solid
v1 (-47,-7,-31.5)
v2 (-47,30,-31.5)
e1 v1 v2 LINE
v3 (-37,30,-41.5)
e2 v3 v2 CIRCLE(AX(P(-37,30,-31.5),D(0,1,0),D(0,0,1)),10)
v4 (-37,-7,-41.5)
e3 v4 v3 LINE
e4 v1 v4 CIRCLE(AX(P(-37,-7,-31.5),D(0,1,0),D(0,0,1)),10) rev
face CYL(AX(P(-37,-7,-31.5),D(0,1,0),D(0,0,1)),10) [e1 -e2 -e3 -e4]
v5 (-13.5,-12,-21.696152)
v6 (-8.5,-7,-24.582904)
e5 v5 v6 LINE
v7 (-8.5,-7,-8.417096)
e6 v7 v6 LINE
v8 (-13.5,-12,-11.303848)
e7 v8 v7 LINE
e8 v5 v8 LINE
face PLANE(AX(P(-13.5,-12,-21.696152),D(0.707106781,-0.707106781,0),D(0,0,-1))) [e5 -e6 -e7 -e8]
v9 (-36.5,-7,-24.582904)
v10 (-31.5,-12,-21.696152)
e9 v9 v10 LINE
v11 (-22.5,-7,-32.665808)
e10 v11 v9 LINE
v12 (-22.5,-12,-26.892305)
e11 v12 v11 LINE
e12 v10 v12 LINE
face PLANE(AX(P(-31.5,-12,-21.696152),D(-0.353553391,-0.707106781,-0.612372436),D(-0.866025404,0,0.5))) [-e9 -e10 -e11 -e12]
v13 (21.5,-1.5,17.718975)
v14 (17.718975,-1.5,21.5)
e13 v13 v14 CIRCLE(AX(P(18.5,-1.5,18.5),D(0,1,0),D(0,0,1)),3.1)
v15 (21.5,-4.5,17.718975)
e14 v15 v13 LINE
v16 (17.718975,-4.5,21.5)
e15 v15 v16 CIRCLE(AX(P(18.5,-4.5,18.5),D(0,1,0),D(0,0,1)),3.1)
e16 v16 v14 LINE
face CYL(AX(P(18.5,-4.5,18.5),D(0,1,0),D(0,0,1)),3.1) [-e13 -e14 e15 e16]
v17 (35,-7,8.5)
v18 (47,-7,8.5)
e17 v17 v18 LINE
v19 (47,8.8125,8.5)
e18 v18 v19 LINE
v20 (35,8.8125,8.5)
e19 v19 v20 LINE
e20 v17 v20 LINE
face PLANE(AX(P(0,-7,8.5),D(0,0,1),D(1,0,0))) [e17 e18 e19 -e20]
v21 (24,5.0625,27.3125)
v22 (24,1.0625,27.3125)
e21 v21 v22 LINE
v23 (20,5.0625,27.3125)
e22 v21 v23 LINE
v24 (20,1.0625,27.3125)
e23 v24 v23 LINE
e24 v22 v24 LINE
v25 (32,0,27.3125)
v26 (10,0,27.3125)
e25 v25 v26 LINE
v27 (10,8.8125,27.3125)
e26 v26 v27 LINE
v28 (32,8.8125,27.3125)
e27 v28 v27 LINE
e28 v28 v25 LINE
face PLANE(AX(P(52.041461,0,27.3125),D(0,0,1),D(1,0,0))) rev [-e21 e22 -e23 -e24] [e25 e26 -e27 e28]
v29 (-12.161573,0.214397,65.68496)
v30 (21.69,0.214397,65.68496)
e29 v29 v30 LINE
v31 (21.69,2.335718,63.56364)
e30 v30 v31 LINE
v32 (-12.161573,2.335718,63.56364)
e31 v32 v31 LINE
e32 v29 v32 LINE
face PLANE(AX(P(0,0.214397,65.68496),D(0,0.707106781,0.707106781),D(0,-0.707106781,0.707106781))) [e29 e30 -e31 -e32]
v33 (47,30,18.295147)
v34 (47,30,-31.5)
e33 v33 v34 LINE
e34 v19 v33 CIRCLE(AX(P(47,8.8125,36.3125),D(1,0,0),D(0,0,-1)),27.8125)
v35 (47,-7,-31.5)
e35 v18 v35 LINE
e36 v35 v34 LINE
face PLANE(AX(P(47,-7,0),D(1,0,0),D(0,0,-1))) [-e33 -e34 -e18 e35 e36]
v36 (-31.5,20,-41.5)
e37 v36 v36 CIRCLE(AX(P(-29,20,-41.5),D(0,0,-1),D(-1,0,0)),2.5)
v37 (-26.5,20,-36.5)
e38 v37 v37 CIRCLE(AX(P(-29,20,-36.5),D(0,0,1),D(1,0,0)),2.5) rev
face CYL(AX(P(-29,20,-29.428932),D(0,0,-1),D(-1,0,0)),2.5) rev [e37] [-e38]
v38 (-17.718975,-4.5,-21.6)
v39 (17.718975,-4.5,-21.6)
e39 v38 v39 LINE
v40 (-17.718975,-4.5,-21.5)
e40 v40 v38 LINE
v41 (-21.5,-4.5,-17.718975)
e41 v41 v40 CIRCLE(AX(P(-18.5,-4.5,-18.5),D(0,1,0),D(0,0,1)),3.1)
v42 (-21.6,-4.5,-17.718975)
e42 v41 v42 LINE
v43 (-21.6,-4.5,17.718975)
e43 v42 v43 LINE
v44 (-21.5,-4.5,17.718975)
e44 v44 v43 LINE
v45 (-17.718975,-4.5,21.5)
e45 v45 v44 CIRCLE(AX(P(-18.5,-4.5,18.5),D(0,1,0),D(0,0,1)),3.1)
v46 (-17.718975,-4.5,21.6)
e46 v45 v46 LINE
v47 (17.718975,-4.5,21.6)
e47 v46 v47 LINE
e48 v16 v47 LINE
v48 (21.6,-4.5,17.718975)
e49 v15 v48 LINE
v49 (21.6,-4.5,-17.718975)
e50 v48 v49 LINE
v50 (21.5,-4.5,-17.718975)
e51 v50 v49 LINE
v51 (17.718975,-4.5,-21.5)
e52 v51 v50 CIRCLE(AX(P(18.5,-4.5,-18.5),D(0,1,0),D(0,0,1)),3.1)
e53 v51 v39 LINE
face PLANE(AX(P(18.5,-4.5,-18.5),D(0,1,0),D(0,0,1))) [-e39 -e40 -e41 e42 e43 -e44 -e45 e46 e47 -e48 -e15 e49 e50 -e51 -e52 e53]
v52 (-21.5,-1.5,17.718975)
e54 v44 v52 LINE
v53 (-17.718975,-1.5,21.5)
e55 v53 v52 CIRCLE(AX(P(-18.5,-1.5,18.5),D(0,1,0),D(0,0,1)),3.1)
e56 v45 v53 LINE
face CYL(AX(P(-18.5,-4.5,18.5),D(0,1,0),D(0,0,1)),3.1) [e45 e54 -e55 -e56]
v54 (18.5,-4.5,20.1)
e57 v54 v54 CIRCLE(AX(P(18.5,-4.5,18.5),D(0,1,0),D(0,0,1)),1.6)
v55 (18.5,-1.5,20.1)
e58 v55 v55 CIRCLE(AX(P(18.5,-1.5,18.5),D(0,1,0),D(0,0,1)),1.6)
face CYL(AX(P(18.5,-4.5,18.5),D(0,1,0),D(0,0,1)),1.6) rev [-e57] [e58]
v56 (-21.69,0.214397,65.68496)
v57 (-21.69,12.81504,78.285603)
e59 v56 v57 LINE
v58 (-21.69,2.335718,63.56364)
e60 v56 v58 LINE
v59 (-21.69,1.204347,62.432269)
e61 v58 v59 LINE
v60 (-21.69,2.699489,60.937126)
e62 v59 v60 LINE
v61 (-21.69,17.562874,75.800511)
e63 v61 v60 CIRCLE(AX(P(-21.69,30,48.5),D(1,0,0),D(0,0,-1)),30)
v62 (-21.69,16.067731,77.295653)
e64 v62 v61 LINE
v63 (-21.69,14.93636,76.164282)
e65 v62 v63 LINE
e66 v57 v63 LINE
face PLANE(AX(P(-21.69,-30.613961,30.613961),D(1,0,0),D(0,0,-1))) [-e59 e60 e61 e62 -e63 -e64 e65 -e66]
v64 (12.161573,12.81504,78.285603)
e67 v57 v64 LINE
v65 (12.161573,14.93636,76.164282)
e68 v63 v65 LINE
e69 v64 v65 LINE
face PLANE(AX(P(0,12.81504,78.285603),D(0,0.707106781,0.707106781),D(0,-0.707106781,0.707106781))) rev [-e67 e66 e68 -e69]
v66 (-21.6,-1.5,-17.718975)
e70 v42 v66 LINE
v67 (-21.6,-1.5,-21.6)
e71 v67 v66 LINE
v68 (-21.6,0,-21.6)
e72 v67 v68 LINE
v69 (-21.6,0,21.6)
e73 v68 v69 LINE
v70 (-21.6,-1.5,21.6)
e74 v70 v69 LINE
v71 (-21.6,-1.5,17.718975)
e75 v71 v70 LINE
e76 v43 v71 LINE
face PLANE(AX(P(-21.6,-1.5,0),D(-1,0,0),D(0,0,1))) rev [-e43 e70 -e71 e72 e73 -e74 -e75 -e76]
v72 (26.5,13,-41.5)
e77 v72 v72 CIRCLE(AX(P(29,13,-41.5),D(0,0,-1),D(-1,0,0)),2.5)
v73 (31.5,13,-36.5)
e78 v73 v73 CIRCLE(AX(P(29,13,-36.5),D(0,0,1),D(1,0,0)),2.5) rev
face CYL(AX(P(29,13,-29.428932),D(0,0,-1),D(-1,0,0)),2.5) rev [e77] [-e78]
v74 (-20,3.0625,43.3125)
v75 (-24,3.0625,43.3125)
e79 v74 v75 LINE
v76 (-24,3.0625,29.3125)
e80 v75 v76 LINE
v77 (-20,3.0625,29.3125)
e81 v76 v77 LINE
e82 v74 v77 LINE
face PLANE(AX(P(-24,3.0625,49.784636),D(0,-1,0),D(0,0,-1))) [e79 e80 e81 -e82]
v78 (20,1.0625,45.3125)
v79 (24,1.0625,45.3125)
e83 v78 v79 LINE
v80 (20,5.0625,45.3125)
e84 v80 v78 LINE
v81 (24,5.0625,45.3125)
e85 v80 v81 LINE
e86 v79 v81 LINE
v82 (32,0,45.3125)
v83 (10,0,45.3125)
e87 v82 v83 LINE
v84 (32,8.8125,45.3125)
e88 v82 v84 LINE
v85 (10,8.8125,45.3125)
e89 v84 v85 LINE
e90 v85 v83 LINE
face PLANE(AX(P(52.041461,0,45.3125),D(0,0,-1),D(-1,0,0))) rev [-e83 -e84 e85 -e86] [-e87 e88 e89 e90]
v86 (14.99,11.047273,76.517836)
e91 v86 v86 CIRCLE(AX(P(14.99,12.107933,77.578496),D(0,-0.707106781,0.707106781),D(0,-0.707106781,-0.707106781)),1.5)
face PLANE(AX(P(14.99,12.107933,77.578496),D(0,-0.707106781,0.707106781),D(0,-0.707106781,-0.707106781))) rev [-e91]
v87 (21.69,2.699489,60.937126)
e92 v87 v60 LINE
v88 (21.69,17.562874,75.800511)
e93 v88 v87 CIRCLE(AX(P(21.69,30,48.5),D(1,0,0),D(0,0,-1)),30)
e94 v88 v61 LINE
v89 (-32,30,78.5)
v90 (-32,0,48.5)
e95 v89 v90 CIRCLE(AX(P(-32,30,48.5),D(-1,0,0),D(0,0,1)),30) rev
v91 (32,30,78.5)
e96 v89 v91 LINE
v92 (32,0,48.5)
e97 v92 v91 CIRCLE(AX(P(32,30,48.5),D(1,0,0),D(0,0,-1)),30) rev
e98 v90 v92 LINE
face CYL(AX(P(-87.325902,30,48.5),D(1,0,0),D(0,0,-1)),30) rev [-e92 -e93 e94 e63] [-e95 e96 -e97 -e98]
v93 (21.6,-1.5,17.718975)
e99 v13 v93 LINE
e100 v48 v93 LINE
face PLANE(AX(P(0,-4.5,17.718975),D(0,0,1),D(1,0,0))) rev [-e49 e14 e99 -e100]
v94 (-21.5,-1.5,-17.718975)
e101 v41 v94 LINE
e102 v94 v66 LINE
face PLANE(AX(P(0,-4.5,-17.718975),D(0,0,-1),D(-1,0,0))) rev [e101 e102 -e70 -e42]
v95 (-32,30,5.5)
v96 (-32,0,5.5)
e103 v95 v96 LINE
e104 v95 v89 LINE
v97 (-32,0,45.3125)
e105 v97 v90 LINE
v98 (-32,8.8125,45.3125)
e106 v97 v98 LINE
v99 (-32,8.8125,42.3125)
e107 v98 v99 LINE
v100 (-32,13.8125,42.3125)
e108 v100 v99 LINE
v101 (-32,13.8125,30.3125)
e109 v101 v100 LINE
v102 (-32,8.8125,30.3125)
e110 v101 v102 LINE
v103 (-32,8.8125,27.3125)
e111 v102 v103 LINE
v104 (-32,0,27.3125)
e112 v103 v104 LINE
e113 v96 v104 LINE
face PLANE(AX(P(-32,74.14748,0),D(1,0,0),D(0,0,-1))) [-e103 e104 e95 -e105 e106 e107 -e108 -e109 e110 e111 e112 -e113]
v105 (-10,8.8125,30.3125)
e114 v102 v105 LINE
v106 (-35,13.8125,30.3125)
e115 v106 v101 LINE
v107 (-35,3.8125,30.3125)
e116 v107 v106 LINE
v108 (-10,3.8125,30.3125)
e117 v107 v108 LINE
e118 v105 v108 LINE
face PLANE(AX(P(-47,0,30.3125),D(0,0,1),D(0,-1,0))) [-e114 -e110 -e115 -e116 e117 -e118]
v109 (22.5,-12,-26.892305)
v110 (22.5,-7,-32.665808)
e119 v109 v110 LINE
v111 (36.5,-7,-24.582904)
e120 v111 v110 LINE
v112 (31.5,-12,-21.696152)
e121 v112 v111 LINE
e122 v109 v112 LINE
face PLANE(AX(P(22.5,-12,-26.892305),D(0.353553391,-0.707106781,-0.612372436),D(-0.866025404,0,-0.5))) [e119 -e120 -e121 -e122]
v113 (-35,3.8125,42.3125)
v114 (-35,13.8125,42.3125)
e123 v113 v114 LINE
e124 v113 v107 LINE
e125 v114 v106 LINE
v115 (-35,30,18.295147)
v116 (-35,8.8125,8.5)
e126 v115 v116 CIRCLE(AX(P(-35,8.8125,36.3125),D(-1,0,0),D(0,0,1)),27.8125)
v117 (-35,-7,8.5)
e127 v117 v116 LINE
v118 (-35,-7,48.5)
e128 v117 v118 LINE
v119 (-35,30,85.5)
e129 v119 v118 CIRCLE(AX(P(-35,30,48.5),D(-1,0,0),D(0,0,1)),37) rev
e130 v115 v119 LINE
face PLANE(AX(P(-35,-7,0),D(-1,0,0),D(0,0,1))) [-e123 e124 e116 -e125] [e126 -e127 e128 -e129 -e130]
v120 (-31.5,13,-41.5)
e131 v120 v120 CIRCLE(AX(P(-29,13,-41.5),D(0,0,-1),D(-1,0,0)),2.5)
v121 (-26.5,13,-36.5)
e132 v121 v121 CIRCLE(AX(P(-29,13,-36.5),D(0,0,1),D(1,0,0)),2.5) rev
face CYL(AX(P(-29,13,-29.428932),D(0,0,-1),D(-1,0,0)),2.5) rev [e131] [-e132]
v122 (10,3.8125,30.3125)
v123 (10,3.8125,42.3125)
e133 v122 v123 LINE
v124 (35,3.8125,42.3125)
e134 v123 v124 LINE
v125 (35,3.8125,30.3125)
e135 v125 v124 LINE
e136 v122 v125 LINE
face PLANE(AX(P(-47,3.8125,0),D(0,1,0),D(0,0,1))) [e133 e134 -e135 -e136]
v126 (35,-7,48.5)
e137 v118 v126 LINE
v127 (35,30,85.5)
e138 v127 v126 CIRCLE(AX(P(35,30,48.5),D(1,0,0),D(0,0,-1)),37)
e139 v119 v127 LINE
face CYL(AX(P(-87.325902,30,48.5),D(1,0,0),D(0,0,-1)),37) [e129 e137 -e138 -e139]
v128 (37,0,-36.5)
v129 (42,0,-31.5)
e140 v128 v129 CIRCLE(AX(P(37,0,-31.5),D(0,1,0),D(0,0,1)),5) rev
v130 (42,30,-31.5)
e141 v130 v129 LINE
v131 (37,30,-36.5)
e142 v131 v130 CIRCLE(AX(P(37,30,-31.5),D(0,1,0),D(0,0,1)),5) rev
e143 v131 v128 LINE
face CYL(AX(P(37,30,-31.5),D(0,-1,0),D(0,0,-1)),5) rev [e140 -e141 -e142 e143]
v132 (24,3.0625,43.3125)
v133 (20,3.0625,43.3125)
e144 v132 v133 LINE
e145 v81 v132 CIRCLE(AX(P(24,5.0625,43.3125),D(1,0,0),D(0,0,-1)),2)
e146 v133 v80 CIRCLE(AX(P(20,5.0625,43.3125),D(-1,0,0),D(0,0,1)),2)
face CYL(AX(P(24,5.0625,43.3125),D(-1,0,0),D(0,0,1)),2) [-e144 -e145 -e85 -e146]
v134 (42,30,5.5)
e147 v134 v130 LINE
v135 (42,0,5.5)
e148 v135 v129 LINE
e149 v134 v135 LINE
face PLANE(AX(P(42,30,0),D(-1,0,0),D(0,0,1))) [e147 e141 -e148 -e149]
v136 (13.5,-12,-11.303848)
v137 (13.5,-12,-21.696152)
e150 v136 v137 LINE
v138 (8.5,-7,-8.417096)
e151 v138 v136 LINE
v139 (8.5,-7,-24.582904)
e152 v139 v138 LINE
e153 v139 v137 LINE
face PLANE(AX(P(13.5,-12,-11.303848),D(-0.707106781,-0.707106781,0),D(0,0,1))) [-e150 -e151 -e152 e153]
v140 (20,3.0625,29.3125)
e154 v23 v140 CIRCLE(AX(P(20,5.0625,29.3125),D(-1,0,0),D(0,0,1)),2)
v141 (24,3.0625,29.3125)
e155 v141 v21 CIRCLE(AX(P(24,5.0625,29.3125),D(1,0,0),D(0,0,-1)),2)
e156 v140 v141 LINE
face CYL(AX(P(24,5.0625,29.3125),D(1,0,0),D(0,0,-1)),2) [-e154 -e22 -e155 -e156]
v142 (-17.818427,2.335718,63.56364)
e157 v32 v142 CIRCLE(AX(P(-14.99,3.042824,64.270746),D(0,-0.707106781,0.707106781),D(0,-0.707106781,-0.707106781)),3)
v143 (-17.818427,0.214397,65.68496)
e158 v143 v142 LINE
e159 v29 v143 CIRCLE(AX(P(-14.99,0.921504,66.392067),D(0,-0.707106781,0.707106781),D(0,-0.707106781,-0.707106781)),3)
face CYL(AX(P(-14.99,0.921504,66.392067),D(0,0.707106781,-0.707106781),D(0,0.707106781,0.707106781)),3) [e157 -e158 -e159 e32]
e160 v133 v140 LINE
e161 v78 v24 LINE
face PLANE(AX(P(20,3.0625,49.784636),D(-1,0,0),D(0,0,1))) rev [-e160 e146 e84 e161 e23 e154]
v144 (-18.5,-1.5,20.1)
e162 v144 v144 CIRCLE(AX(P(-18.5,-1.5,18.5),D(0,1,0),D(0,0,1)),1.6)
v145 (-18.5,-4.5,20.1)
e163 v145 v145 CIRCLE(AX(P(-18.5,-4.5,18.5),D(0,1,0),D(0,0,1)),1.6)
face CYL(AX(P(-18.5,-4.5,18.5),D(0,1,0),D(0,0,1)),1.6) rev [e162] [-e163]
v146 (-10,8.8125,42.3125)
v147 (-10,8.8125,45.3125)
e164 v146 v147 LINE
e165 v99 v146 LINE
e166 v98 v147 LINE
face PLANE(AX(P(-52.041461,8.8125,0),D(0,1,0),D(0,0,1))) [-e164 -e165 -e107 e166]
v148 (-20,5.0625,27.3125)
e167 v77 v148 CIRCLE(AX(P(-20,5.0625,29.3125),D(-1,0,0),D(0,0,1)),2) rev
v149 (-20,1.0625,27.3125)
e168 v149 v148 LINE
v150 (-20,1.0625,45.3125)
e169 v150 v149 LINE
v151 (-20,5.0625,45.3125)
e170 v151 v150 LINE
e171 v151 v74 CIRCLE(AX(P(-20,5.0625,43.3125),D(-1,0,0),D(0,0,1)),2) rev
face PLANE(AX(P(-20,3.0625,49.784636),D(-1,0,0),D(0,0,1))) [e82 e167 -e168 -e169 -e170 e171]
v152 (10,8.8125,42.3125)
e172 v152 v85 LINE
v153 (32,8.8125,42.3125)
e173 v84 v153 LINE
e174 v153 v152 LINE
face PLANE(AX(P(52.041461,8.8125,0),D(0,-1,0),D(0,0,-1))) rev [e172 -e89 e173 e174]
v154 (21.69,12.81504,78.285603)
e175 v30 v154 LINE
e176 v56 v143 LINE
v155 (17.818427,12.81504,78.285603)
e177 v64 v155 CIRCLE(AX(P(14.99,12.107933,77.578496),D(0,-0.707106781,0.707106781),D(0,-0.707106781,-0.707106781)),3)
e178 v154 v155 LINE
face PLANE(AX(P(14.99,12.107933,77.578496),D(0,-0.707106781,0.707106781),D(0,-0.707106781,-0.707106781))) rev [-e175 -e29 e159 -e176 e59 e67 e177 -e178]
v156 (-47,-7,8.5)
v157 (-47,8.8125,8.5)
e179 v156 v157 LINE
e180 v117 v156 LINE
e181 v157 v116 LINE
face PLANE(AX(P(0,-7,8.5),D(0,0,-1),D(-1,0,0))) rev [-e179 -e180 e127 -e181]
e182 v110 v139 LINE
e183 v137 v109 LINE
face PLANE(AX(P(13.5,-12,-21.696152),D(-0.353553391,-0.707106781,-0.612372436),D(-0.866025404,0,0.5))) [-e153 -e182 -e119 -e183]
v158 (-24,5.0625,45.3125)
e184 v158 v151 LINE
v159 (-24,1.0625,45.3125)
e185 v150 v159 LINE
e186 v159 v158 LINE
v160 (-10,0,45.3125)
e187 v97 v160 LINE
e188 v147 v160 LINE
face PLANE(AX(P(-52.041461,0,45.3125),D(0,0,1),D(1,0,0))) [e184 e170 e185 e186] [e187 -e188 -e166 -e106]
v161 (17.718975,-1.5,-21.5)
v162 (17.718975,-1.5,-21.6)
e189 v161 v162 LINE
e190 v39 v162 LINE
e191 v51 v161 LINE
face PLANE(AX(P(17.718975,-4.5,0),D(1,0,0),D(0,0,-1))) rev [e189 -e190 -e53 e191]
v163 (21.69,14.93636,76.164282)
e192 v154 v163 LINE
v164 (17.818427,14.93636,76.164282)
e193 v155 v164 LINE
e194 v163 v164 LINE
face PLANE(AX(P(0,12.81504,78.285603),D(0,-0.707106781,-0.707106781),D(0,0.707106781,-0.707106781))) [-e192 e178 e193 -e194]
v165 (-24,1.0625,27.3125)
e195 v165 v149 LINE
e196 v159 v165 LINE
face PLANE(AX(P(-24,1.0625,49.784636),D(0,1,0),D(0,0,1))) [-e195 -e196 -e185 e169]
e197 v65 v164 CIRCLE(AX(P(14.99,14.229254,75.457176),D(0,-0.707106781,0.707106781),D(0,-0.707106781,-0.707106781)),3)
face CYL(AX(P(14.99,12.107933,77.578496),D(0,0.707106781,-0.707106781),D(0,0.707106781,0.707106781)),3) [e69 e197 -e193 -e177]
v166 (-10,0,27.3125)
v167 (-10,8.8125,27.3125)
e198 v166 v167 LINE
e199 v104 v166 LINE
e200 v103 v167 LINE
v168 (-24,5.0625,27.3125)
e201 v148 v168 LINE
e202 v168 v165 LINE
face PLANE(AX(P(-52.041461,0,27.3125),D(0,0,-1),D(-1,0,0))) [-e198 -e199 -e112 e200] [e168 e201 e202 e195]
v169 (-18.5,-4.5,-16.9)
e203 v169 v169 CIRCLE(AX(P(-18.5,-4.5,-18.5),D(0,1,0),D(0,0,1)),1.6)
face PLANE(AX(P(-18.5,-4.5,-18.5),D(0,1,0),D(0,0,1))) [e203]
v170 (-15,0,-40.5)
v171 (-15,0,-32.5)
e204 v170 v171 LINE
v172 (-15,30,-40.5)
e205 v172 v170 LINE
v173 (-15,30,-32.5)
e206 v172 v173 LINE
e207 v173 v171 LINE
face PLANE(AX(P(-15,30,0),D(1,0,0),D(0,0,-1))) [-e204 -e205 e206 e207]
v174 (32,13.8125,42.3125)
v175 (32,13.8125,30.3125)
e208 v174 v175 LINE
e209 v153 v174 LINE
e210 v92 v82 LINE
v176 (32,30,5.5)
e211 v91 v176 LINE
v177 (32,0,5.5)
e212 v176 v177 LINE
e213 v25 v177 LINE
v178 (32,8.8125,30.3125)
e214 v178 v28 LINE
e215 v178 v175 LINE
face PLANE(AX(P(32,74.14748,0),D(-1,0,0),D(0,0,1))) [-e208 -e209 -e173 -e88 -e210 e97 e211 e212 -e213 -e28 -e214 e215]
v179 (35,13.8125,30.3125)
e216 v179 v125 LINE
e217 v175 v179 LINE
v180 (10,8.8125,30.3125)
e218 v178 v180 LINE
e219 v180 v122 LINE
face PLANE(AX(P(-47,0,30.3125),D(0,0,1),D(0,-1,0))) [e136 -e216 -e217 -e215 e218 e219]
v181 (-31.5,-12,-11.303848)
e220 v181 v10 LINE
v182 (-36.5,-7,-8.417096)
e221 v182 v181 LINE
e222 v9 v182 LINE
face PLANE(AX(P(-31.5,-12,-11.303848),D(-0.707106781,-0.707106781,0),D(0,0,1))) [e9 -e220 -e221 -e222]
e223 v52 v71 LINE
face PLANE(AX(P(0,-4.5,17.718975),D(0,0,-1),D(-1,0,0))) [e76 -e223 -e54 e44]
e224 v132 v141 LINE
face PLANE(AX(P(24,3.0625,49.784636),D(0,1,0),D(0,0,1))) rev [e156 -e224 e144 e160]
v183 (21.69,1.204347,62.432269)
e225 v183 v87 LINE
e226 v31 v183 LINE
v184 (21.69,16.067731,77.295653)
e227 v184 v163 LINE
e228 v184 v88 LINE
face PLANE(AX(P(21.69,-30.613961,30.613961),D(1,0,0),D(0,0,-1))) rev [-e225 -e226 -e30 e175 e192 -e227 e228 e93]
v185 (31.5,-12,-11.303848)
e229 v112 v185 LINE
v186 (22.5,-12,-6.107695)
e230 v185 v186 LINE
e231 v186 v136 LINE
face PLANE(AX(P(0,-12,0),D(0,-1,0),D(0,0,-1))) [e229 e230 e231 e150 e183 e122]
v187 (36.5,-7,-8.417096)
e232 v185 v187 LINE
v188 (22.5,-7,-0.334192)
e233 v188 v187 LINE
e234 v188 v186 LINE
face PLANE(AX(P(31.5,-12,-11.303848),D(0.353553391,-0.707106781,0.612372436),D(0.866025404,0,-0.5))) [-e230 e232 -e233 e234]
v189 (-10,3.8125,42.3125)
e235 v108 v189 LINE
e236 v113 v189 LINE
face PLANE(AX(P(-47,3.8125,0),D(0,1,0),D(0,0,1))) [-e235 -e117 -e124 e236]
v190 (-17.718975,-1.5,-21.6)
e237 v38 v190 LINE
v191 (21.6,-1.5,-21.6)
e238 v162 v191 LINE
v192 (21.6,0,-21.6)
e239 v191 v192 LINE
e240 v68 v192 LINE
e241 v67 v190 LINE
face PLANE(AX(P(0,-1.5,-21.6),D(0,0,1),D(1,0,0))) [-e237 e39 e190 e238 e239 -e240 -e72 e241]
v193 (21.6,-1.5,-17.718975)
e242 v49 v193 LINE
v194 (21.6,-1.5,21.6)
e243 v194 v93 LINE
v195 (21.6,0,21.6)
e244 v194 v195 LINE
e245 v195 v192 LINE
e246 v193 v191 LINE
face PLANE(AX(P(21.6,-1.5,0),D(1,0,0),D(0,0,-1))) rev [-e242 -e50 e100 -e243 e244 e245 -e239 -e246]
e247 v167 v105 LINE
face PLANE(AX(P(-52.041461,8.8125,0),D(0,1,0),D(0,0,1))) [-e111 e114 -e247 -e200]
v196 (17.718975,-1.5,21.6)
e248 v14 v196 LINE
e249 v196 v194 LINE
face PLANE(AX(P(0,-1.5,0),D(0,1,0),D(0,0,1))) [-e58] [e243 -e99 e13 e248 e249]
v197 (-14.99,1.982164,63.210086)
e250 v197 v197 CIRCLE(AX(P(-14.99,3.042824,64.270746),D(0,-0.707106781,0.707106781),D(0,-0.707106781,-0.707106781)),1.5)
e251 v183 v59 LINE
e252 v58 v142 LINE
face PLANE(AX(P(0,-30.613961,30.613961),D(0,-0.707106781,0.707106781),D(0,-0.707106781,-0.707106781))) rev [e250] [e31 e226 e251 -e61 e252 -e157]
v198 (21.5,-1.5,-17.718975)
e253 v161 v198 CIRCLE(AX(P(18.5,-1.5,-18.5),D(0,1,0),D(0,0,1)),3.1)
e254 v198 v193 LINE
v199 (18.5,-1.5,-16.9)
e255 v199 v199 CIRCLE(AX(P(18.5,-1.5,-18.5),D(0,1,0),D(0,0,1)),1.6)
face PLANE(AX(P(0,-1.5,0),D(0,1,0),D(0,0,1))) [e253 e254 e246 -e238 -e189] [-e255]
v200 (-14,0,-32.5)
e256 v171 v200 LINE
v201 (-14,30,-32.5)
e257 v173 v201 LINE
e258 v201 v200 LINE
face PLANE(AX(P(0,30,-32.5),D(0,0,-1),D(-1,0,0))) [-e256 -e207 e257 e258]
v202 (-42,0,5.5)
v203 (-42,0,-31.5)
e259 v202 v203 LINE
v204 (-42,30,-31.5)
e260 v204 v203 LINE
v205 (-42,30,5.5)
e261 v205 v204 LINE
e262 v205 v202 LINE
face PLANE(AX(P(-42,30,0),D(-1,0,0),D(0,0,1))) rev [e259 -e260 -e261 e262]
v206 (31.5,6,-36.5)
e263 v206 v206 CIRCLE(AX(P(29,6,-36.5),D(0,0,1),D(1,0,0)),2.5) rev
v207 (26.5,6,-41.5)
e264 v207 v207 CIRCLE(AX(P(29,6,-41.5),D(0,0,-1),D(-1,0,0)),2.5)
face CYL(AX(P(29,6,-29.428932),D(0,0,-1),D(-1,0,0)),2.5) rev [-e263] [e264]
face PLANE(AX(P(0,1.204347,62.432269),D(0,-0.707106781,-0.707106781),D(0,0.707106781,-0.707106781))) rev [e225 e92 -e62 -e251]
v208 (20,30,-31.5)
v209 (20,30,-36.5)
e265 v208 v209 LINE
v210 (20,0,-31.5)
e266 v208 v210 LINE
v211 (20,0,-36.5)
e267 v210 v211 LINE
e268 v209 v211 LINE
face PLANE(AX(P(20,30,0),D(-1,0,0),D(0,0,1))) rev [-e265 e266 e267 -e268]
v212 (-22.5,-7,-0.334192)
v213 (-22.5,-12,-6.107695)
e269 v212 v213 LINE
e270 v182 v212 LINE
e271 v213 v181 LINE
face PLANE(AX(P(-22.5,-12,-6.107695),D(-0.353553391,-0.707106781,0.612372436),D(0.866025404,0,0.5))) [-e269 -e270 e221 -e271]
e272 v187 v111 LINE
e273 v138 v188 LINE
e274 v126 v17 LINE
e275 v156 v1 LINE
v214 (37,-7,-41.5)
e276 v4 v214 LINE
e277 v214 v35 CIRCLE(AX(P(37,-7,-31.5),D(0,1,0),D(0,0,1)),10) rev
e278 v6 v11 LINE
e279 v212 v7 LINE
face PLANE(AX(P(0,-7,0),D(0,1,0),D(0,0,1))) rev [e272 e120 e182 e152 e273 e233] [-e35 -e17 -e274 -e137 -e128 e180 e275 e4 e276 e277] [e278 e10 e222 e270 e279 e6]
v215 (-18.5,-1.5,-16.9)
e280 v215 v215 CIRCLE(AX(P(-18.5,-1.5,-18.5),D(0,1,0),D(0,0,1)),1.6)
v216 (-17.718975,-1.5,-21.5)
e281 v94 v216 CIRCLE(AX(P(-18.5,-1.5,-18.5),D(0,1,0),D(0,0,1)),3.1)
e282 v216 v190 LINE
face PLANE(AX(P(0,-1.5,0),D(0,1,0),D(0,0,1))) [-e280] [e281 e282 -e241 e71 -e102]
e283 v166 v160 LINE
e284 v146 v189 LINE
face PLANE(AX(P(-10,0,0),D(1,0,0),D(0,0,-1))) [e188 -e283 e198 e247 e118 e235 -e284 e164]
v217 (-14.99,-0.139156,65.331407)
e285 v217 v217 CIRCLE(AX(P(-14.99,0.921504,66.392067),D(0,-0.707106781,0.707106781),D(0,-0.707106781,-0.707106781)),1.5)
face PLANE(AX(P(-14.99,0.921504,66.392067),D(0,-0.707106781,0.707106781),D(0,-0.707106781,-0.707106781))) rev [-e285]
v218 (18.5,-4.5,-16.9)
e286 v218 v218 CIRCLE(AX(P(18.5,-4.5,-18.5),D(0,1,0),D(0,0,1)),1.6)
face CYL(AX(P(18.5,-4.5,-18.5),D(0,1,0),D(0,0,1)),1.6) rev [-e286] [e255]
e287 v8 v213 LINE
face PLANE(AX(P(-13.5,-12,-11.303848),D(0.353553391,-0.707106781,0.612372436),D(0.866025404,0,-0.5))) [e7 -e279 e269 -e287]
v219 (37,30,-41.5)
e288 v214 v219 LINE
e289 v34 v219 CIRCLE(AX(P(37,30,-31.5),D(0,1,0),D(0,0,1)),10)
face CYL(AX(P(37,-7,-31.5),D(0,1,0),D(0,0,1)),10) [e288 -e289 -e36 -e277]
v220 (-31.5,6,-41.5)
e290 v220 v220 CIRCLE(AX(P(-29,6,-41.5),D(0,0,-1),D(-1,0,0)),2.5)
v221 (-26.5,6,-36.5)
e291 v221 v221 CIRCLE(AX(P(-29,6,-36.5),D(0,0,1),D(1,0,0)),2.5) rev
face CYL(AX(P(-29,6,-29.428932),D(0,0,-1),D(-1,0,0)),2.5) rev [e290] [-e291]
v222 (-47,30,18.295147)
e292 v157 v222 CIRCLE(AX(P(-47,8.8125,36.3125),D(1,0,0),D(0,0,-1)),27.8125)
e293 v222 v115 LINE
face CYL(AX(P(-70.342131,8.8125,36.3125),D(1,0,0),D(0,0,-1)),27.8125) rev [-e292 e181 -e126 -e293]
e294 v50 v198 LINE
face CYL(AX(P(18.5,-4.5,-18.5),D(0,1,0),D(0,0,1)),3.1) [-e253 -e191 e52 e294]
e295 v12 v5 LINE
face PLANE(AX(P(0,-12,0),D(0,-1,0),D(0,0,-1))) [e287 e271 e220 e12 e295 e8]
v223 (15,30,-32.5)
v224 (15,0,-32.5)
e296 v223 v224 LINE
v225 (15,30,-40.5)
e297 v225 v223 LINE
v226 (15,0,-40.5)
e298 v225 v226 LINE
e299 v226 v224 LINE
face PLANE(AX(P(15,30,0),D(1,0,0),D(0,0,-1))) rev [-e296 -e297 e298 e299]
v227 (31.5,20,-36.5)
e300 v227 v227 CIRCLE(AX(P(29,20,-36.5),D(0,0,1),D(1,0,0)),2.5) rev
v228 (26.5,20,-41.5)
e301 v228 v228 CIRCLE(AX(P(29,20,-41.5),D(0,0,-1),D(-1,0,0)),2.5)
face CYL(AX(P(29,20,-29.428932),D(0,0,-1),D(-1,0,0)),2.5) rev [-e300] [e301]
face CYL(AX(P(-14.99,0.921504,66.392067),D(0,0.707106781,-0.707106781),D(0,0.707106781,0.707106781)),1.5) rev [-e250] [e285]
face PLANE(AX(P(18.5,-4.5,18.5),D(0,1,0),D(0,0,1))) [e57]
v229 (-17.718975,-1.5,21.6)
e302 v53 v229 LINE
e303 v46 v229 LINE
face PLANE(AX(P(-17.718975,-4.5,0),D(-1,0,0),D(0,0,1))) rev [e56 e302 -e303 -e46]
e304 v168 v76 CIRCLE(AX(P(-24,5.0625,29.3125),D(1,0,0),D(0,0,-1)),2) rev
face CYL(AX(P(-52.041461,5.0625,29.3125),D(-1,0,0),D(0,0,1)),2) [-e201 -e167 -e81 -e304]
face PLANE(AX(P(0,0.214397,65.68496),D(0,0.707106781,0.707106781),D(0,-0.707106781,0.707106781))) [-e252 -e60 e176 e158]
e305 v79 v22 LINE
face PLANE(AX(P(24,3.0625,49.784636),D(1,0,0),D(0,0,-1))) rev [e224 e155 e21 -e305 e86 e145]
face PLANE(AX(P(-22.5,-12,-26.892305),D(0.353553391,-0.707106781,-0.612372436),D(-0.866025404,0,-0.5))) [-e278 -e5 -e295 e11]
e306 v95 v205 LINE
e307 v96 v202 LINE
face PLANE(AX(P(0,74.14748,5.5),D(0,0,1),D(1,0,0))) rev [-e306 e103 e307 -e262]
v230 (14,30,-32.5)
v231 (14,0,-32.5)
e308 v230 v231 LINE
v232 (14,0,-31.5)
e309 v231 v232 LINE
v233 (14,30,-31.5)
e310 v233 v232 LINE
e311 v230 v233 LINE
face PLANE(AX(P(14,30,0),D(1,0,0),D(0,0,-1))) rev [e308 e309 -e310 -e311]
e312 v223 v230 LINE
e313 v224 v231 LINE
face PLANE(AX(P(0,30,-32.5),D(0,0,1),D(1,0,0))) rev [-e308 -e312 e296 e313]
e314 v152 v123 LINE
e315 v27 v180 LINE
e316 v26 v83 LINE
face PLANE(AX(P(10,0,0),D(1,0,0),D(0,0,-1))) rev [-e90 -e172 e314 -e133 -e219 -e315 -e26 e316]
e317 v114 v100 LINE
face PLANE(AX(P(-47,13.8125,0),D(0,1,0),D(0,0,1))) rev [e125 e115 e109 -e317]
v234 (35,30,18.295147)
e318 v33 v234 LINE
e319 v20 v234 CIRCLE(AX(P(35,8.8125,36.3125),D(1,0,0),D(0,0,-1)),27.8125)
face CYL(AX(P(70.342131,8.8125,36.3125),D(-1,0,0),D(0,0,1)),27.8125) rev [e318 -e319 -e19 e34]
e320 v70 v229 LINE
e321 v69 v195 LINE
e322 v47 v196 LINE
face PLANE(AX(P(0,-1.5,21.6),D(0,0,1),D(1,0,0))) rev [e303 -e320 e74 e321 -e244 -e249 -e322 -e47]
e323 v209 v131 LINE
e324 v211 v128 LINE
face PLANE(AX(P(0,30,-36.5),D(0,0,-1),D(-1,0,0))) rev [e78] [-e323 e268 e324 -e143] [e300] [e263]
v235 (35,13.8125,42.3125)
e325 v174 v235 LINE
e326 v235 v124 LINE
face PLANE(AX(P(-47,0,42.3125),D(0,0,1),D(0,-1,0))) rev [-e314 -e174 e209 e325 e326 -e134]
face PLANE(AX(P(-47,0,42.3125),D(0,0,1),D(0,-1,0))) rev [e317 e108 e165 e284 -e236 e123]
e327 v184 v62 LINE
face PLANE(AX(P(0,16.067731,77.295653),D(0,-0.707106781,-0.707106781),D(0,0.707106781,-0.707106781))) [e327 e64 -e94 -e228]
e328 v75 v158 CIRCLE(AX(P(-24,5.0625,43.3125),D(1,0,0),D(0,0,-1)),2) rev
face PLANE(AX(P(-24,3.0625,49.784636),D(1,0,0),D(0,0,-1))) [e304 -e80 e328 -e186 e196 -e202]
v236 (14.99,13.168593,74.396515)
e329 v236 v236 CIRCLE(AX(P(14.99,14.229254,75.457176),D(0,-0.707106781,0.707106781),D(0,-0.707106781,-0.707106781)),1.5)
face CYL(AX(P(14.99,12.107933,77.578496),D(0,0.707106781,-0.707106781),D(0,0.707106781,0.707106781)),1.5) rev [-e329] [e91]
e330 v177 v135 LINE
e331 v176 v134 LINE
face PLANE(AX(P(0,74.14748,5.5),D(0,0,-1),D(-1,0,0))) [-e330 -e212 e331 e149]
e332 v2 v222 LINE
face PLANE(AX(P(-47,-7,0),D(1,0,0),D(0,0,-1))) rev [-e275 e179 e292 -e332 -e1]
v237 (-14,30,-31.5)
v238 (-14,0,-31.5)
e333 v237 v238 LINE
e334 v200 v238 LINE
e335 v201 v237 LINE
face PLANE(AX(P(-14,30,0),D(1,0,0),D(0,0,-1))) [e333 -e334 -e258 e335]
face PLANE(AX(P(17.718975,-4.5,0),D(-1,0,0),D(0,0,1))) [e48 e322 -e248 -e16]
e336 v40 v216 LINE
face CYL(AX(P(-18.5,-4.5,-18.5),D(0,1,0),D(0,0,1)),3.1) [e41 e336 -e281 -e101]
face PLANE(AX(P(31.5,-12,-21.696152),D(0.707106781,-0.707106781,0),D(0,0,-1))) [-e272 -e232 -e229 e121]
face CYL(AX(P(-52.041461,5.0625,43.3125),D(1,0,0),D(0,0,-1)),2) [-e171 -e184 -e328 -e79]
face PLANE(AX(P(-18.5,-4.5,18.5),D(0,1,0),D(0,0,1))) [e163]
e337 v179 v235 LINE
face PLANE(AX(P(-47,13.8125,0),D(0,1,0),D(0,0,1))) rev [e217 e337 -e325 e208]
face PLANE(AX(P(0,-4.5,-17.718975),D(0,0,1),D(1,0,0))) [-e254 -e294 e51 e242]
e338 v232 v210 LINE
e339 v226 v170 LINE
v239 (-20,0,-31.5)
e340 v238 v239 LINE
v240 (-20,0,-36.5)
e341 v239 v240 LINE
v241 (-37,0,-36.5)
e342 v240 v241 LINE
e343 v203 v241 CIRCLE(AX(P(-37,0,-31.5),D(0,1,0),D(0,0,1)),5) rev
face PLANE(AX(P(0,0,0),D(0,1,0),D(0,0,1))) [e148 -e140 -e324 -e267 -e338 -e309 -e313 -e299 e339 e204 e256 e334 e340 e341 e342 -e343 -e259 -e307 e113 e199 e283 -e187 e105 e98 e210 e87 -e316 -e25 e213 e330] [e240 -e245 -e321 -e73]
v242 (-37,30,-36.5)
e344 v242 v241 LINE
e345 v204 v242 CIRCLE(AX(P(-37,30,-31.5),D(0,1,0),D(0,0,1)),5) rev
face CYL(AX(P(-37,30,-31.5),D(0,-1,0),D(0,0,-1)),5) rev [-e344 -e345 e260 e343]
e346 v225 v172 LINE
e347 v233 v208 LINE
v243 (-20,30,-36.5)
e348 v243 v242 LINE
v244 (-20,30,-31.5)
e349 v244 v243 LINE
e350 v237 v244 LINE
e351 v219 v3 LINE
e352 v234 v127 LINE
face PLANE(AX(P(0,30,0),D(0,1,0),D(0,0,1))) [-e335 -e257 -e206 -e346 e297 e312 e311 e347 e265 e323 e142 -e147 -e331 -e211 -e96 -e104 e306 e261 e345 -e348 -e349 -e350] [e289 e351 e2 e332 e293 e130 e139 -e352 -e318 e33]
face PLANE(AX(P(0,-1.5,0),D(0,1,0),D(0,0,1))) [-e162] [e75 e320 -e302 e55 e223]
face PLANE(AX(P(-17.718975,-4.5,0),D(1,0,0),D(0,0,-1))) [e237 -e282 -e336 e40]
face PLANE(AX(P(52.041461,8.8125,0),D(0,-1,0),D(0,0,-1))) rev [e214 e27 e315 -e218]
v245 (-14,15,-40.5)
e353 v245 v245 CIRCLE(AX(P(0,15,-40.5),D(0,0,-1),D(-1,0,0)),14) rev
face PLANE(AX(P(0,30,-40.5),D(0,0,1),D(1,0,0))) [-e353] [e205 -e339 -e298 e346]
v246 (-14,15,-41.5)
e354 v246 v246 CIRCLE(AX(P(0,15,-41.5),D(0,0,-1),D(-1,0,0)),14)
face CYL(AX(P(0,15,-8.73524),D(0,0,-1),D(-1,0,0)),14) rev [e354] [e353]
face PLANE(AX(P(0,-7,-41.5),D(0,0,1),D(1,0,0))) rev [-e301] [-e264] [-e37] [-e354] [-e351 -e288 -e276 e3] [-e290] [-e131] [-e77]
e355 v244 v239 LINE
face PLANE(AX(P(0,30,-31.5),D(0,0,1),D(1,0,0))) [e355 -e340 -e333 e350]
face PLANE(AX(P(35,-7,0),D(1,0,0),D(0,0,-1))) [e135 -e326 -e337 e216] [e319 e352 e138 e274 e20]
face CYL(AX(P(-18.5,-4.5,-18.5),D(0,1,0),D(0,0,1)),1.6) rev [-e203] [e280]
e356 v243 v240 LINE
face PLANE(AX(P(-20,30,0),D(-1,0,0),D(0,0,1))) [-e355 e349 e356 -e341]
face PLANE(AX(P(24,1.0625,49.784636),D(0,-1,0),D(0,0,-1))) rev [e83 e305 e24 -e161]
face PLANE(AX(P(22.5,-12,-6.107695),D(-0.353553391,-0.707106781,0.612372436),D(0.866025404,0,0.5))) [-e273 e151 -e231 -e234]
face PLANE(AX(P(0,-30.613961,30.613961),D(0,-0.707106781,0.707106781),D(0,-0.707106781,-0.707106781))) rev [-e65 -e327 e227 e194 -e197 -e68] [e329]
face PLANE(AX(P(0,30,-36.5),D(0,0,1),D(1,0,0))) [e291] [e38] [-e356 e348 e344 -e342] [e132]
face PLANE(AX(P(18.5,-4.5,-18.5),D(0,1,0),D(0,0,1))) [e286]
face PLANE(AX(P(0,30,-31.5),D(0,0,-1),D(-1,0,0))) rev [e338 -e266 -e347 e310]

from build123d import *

# Parameters (mm, degrees)
BOSS_EXTRUDE1_DEPTH             = 7
SKETCH1_5_W                     = 43.2
SKETCH1_5_H                     = 43.2
CUT_EXTRUDE1_DEPTH              = 1.5
CUT_EXTRUDE2_START              = -1.5
SKETCH1_6_R                     = 1.6
CUT_EXTRUDE2_DEPTH              = 3
BOSS_EXTRUDE2_START             = 30
BOSS_EXTRUDE2_DEPTH             = 30
BOSS_EXTRUDE3_REACH             = 75.9
BOSS_EXTRUDE3_DIRECTION_2_REACH = 75.9
SKETCH6_W                       = 43.38
SKETCH6_H                       = 21.02
CUT_EXTRUDE3_DEPTH              = 9
CUT_EXTRUDE4_START              = 9
SKETCH6_3_R                     = 1.5
CUT_EXTRUDE4_DEPTH              = 3
BOSS_EXTRUDE4_DEPTH             = 30
BOSS_EXTRUDE6_REACH             = 107.873
SKETCH8_W                       = 3
SKETCH8_H                       = 30
SKETCH9_R                       = 2.5
CUT_EXTRUDE5_DEPTH              = 5
CUT_EXTRUDE6_DEPTH              = 103.074727528
CUT_EXTRUDE6_DEPTH_BACK         = 103.074727528
SKETCH10_W                      = 12
SKETCH10_H                      = 10
BOSS_EXTRUDE7_START             = 10
BOSS_EXTRUDE7_DEPTH             = 22
BOSS_EXTRUDE8_START             = -10
BOSS_EXTRUDE8_DEPTH             = 22
BOSS_EXTRUDE9_START             = -35
BOSS_EXTRUDE9_DEPTH             = 12
BOSS_EXTRUDE10_START            = 47
BOSS_EXTRUDE10_DEPTH            = 12
BOSS_EXTRUDE11_DEPTH            = 5
CHAMFER1_SIZE                   = 5
BOSS_EXTRUDE12_DEPTH            = 1
SKETCH14_W                      = 4
SKETCH14_H                      = 2
CUT_EXTRUDE7_DEPTH              = 18
FILLET1_R                       = 2


with BuildPart() as part:
    # Sketch1 → Boss-Extrude1 (new body)
    with BuildSketch(Plane(origin=(0, 0, 0), x_dir=(1, 0, 0), z_dir=(0, 1, 0))):
        with BuildLine():
            Line((-35, -8.5), (-35, -48.5))
            Line((-35, -48.5), (35, -48.5))
            Line((35, -48.5), (35, -8.5))
            Line((35, -8.5), (47, -8.5))
            Line((47, -8.5), (47, 31.5))
            ThreePointArc((47, 31.5), (44.071067812, 38.571067812), (37, 41.5))
            Line((37, 41.5), (-37, 41.5))
            ThreePointArc((-37, 41.5), (-44.071067812, 38.571067812), (-47, 31.5))
            Line((-47, 31.5), (-47, -8.5))
            Line((-47, -8.5), (-35, -8.5))
        make_face()
    extrude(amount=-BOSS_EXTRUDE1_DEPTH)

    # Sketch1<5> → Cut-Extrude1 (cut)
    with BuildSketch(Plane(origin=(0, 0, 0), x_dir=(1, 0, 0), z_dir=(0, 1, 0))):
        Rectangle(SKETCH1_5_W, SKETCH1_5_H)
    extrude(amount=-CUT_EXTRUDE1_DEPTH, mode=Mode.SUBTRACT)

    # Sketch1<6> → Cut-Extrude2 (cut)
    with BuildSketch(Plane(origin=(0, 0, 0), x_dir=(1, 0, 0), z_dir=(0, 1, 0)).offset(CUT_EXTRUDE2_START)):
        with BuildLine():
            ThreePointArc((-17.718975032, 21.5), (-16.307968978, 16.307968978), (-21.5, 17.718975032))
            Line((-21.5, 17.718975032), (-21.6, 17.718975032))
            Line((-21.6, 17.718975032), (-21.6, -17.718975032))
            Line((-21.6, -17.718975032), (-21.5, -17.718975032))
            ThreePointArc((-21.5, -17.718975032), (-16.307968978, -16.307968978), (-17.718975032, -21.5))
            Line((-17.718975032, -21.5), (-17.718975032, -21.6))
            Line((-17.718975032, -21.6), (17.718975032, -21.6))
            Line((17.718975032, -21.6), (17.718975032, -21.5))
            ThreePointArc((17.718975032, -21.5), (16.307968978, -16.307968978), (21.5, -17.718975032))
            Line((21.5, -17.718975032), (21.6, -17.718975032))
            Line((21.6, -17.718975032), (21.6, 17.718975032))
            Line((21.6, 17.718975032), (21.5, 17.718975032))
            ThreePointArc((21.5, 17.718975032), (16.307968978, 16.307968978), (17.718975032, 21.5))
            Line((17.718975032, 21.5), (17.718975032, 21.6))
            Line((17.718975032, 21.6), (-17.718975032, 21.6))
            Line((-17.718975032, 21.6), (-17.718975032, 21.5))
        make_face()
        with Locations(Location((-18.5, 18.5, 0), (0, 0, 270))):
            Circle(SKETCH1_6_R)
        with Locations(Location((18.5, 18.5, 0), (0, 0, 270))):
            Circle(SKETCH1_6_R)
        with Locations(Location((-18.5, -18.5, 0), (0, 0, 270))):
            Circle(SKETCH1_6_R)
        with Locations(Location((18.5, -18.5, 0), (0, 0, 270))):
            Circle(SKETCH1_6_R)
    extrude(amount=-CUT_EXTRUDE2_DEPTH, mode=Mode.SUBTRACT)

    # Sketch3 → Boss-Extrude2 (add)
    with BuildSketch(Plane(origin=(0, 0, 0), x_dir=(1, 0, 0), z_dir=(0, 1, 0)).offset(BOSS_EXTRUDE2_START)):
        with BuildLine():
            Line((42, -8.5), (47, -8.5))
            Line((47, -8.5), (47, 31.5))
            ThreePointArc((47, 31.5), (44.071067812, 38.571067812), (37, 41.5))
            Line((37, 41.5), (14, 41.5))
            Line((14, 41.5), (14, 40.5))
            Line((14, 40.5), (15, 40.5))
            Line((15, 40.5), (15, 32.5))
            Line((15, 32.5), (14, 32.5))
            Line((14, 32.5), (14, 31.5))
            Line((14, 31.5), (20, 31.5))
            Line((20, 31.5), (20, 36.5))
            Line((20, 36.5), (37, 36.5))
            ThreePointArc((37, 36.5), (40.535533906, 35.035533906), (42, 31.5))
            Line((42, 31.5), (42, -8.5))
        make_face()
        with BuildLine():
            Line((-14, 40.5), (-14, 41.5))
            Line((-14, 41.5), (-37, 41.5))
            ThreePointArc((-37, 41.5), (-44.071067812, 38.571067812), (-47, 31.5))
            Line((-47, 31.5), (-47, -8.5))
            Line((-47, -8.5), (-42, -8.5))
            Line((-42, -8.5), (-42, 31.5))
            ThreePointArc((-42, 31.5), (-40.535533906, 35.035533906), (-37, 36.5))
            Line((-37, 36.5), (-20, 36.5))
            Line((-20, 36.5), (-20, 31.5))
            Line((-20, 31.5), (-14, 31.5))
            Line((-14, 31.5), (-14, 32.5))
            Line((-14, 32.5), (-15, 32.5))
            Line((-15, 32.5), (-15, 40.5))
            Line((-15, 40.5), (-14, 40.5))
        make_face()
    extrude(amount=-BOSS_EXTRUDE2_DEPTH)

    # Boss-Extrude3: up to this face of the body (flat: up to its plane)
    boss_extrude3_end = Plane(part.part.faces().sort_by_distance((-35, -3.5, 28.5))[0])
    # Sketch5 → Boss-Extrude3 (add, up to the picked face)
    with BuildSketch(Plane(origin=(0, 0, 0), x_dir=(0, 0, -1), z_dir=(1, 0, 0)), mode=Mode.PRIVATE) as boss_extrude3_sk1:
        with BuildLine():
            Line((-48.5, 0), (-48.5, -7))
            ThreePointArc((-48.5, -7), (-74.662950904, 3.837049096), (-85.5, 30))
            Line((-85.5, 30), (-78.5, 30))
            ThreePointArc((-78.5, 30), (-69.713203436, 8.786796564), (-48.5, 0))
        make_face()
    boss_extrude3_tool1 = split(extrude(boss_extrude3_sk1.sketch, amount=-BOSS_EXTRUDE3_REACH, mode=Mode.PRIVATE), bisect_by=boss_extrude3_end, keep=Keep.BOTH, mode=Mode.PRIVATE)
    add(boss_extrude3_tool1.solids().sort_by(Axis((0, 8.59564, 69.90436), (-1, 0, 0)))[0])

    # Boss-Extrude3 direction 2: up to this face of the body (flat: up to its plane)
    boss_extrude3_direction_2_end = Plane(part.part.faces().sort_by_distance((35, -3.5, 28.5))[0])
    # Sketch5 → Boss-Extrude3 direction 2 (add, up to the picked face)
    with BuildSketch(Plane(origin=(0, 0, 0), x_dir=(0, 0, -1), z_dir=(1, 0, 0)), mode=Mode.PRIVATE) as boss_extrude3_direction_2_sk1:
        with BuildLine():
            Line((-48.5, 0), (-48.5, -7))
            ThreePointArc((-48.5, -7), (-74.662950904, 3.837049096), (-85.5, 30))
            Line((-85.5, 30), (-78.5, 30))
            ThreePointArc((-78.5, 30), (-69.713203436, 8.786796564), (-48.5, 0))
        make_face()
    boss_extrude3_direction_2_tool1 = split(extrude(boss_extrude3_direction_2_sk1.sketch, amount=BOSS_EXTRUDE3_DIRECTION_2_REACH, mode=Mode.PRIVATE), bisect_by=boss_extrude3_direction_2_end, keep=Keep.BOTH, mode=Mode.PRIVATE)
    add(boss_extrude3_direction_2_tool1.solids().sort_by(Axis((0, 8.59564, 69.90436), (1, 0, 0)))[0])

    # Sketch6 → Cut-Extrude3 (cut)
    with BuildSketch(Plane(origin=(0, -24.25, 24.25), x_dir=(-1, 0, 0), z_dir=(0, -0.7071067811865477, 0.7071067811865474))):
        with Locations((0, -55.507882323)):
            Rectangle(SKETCH6_W, SKETCH6_H)
    extrude(amount=CUT_EXTRUDE3_DEPTH, mode=Mode.SUBTRACT)

    # Sketch6<3> → Cut-Extrude4 (cut)
    with BuildSketch(Plane(origin=(0, -24.25, 24.25), x_dir=(-1, 0, 0), z_dir=(0, -0.7071067811865477, 0.7071067811865474)).offset(CUT_EXTRUDE4_START)):
        with BuildLine():
            Line((-21.69, -64.417882323), (-17.818427125, -64.417882323))
            ThreePointArc((-17.818427125, -64.417882323), (-14.99, -60.417882323), (-12.161572875, -64.417882323))
            Line((-12.161572875, -64.417882323), (21.69, -64.417882323))
            Line((21.69, -64.417882323), (21.69, -46.597882323))
            Line((21.69, -46.597882323), (17.818427125, -46.597882323))
            ThreePointArc((17.818427125, -46.597882323), (14.99, -50.597882323), (12.161572875, -46.597882323))
            Line((12.161572875, -46.597882323), (-21.69, -46.597882323))
            Line((-21.69, -46.597882323), (-21.69, -64.417882323))
        make_face()
        with Locations(Location((-14.99, -63.417882323, 0), (0, 0, 90))):
            Circle(SKETCH6_3_R)
        with Locations(Location((14.99, -47.597882323, 0), (0, 0, 90))):
            Circle(SKETCH6_3_R)
    extrude(amount=CUT_EXTRUDE4_DEPTH, mode=Mode.SUBTRACT)

    # Sketch7 → Boss-Extrude4 (add)
    with BuildSketch(Plane(origin=(0, 0, 0), x_dir=(1, 0, 0), z_dir=(0, 1, 0))):
        Polygon((35, -48.5), (35, -8.5), (42, -8.5), (42, -5.5), (32, -5.5), (32, -48.5), align=None)
        Polygon((-42, -8.5), (-35, -8.5), (-35, -48.5), (-32, -48.5), (-32, -5.5), (-42, -5.5), align=None)
    extrude(amount=BOSS_EXTRUDE4_DEPTH)

    # Sketch8 → Boss-Extrude6 (add, up to next)
    with BuildSketch(Plane.XY.offset(48.5), mode=Mode.PRIVATE) as boss_extrude6_sk1:
        with Locations((33.5, 15)):
            Rectangle(SKETCH8_W, SKETCH8_H)
    boss_extrude6_tool1 = extrude(boss_extrude6_sk1.sketch, amount=BOSS_EXTRUDE6_REACH, mode=Mode.PRIVATE) - part.part
    # Sketch8 → Boss-Extrude6 (add, up to next)
    with BuildSketch(Plane.XY.offset(48.5), mode=Mode.PRIVATE) as boss_extrude6_sk2:
        with Locations((-33.5, 15)):
            Rectangle(SKETCH8_W, SKETCH8_H)
    boss_extrude6_tool2 = extrude(boss_extrude6_sk2.sketch, amount=BOSS_EXTRUDE6_REACH, mode=Mode.PRIVATE) - part.part
    add(boss_extrude6_tool1.solids().sort_by_distance((33.5, 15, 48.5))[0])
    add(boss_extrude6_tool2.solids().sort_by_distance((-33.5, 15, 48.5))[0])

    # Sketch9 → Cut-Extrude5 (cut)
    with BuildSketch(Plane(origin=(0, 0, -41.5), x_dir=(-1, 0, 0), z_dir=(0, 0, -1))):
        with Locations((-29, 20)):
            Circle(SKETCH9_R)
        with Locations((-29, 13)):
            Circle(SKETCH9_R)
        with Locations((-29, 6)):
            Circle(SKETCH9_R)
        with Locations((29, 20)):
            Circle(SKETCH9_R)
        with Locations((29, 13)):
            Circle(SKETCH9_R)
        with Locations((29, 6)):
            Circle(SKETCH9_R)
    extrude(amount=-CUT_EXTRUDE5_DEPTH, mode=Mode.SUBTRACT)

    # Sketch10 → Cut-Extrude6 (cut, two sides: drawn at the far end of the back side and taken through both)
    with BuildSketch(Plane(origin=(0, 0, 0), x_dir=(0, 0, -1), z_dir=(1, 0, 0)).offset(-CUT_EXTRUDE6_DEPTH_BACK)):
        with Locations((-36.3125, 8.8125)):
            Rectangle(SKETCH10_W, SKETCH10_H)
    extrude(amount=CUT_EXTRUDE6_DEPTH + CUT_EXTRUDE6_DEPTH_BACK, mode=Mode.SUBTRACT)

    # Sketch10<3> → Boss-Extrude7 (add)
    with BuildSketch(Plane(origin=(0, 0, 0), x_dir=(0, 0, -1), z_dir=(1, 0, 0)).offset(BOSS_EXTRUDE7_START)):
        Polygon((-27.3125, 8.8125), (-30.3125, 8.8125), (-30.3125, 3.8125), (-42.3125, 3.8125), (-42.3125, 8.8125), (-45.3125, 8.8125), (-45.3125, 0), (-27.3125, 0), align=None)
    extrude(amount=BOSS_EXTRUDE7_DEPTH)

    # Sketch10<4> → Boss-Extrude8 (add)
    with BuildSketch(Plane(origin=(0, 0, 0), x_dir=(0, 0, -1), z_dir=(1, 0, 0)).offset(BOSS_EXTRUDE8_START)):
        Polygon((-27.3125, 8.8125), (-30.3125, 8.8125), (-30.3125, 3.8125), (-42.3125, 3.8125), (-42.3125, 8.8125), (-45.3125, 8.8125), (-45.3125, 0), (-27.3125, 0), align=None)
    extrude(amount=-BOSS_EXTRUDE8_DEPTH)

    # Sketch10<5> → Boss-Extrude9 (add)
    with BuildSketch(Plane(origin=(0, 0, 0), x_dir=(0, 0, -1), z_dir=(1, 0, 0)).offset(BOSS_EXTRUDE9_START)):
        with BuildLine():
            ThreePointArc((-8.5, 8.8125), (-11.067274912, 20.483565354), (-18.295147253, 30))
            Line((-18.295147253, 30), (-8.5, 30))
            Line((-8.5, 30), (-8.5, 8.8125))
        make_face()
    extrude(amount=-BOSS_EXTRUDE9_DEPTH)

    # Sketch10<6> → Boss-Extrude10 (add)
    with BuildSketch(Plane(origin=(0, 0, 0), x_dir=(0, 0, -1), z_dir=(1, 0, 0)).offset(BOSS_EXTRUDE10_START)):
        with BuildLine():
            ThreePointArc((-8.5, 8.8125), (-11.067274912, 20.483565354), (-18.295147253, 30))
            Line((-18.295147253, 30), (-8.5, 30))
            Line((-8.5, 30), (-8.5, 8.8125))
        make_face()
    extrude(amount=-BOSS_EXTRUDE10_DEPTH)

    # Sketch12 → Boss-Extrude11 (add)
    with BuildSketch(Plane.XZ.offset(7)):
        Polygon((-13.5, -11.303847577), (-22.5, -6.107695155), (-31.5, -11.303847577), (-31.5, -21.696152423), (-22.5, -26.892304845), (-13.5, -21.696152423), align=None)
        Polygon((31.5, -11.303847577), (22.5, -6.107695155), (13.5, -11.303847577), (13.5, -21.696152423), (22.5, -26.892304845), (31.5, -21.696152423), align=None)
    extrude(amount=BOSS_EXTRUDE11_DEPTH)

    # Chamfer1
    chamfer1_edges = [part.edges().sort_by_distance(p)[0] for p in [
        (27, -7, -8.705771366),
        (18, -7, -8.705771366),
        (13.5, -7, -16.5),
        (18, -7, -24.294228634),
        (27, -7, -24.294228634),
        (31.5, -7, -16.5),
        (-18, -7, -8.705771366),
        (-27, -7, -8.705771366),
        (-31.5, -7, -16.5),
        (-27, -7, -24.294228634),
        (-18, -7, -24.294228634),
        (-13.5, -7, -16.5),
    ]]
    chamfer(chamfer1_edges, length=CHAMFER1_SIZE - 0.0001)  # a hair under: the kernel refuses the full size

    # Sketch13 → Boss-Extrude12 (add)
    with BuildSketch(Plane(origin=(0, 0, -41.5), x_dir=(-1, 0, 0), z_dir=(0, 0, -1))):
        with BuildLine():
            Line((14, 30), (-14, 30))
            Line((-14, 30), (-14, 15))
            ThreePointArc((-14, 15), (0, 29), (14, 15))
            Line((14, 15), (14, 30))
        make_face()
        with BuildLine():
            ThreePointArc((14, 15), (0, 1), (-14, 15))
            Line((-14, 15), (-14, 0))
            Line((-14, 0), (14, 0))
            Line((14, 0), (14, 15))
        make_face()
    extrude(amount=-BOSS_EXTRUDE12_DEPTH)

    # Sketch14 → Cut-Extrude7 (cut)
    with BuildSketch(Plane(origin=(0, 0, 27.3125), x_dir=(-1, 0, 0), z_dir=(0, 0, -1))):
        with Locations((-22, 2.0625)):
            Rectangle(SKETCH14_W, SKETCH14_H)
    cut_extrude7 = extrude(amount=-CUT_EXTRUDE7_DEPTH, mode=Mode.SUBTRACT)

    # Mirror2: Cut-Extrude7 across plane
    add(cut_extrude7.mirror(Plane(origin=(0, 0, 0), x_dir=(0, 0, 1), z_dir=(1, 0, 0))), mode=Mode.SUBTRACT)

    # Fillet1
    fillet1_edges = [part.edges().sort_by_distance(p)[0] for p in [
        (22, 3.0625, 27.3125),
        (22, 3.0625, 45.3125),
        (-22, 3.0625, 45.3125),
        (-22, 3.0625, 27.3125),
    ]]
    fillet(fillet1_edges, radius=FILLET1_R)


solid = part.part
